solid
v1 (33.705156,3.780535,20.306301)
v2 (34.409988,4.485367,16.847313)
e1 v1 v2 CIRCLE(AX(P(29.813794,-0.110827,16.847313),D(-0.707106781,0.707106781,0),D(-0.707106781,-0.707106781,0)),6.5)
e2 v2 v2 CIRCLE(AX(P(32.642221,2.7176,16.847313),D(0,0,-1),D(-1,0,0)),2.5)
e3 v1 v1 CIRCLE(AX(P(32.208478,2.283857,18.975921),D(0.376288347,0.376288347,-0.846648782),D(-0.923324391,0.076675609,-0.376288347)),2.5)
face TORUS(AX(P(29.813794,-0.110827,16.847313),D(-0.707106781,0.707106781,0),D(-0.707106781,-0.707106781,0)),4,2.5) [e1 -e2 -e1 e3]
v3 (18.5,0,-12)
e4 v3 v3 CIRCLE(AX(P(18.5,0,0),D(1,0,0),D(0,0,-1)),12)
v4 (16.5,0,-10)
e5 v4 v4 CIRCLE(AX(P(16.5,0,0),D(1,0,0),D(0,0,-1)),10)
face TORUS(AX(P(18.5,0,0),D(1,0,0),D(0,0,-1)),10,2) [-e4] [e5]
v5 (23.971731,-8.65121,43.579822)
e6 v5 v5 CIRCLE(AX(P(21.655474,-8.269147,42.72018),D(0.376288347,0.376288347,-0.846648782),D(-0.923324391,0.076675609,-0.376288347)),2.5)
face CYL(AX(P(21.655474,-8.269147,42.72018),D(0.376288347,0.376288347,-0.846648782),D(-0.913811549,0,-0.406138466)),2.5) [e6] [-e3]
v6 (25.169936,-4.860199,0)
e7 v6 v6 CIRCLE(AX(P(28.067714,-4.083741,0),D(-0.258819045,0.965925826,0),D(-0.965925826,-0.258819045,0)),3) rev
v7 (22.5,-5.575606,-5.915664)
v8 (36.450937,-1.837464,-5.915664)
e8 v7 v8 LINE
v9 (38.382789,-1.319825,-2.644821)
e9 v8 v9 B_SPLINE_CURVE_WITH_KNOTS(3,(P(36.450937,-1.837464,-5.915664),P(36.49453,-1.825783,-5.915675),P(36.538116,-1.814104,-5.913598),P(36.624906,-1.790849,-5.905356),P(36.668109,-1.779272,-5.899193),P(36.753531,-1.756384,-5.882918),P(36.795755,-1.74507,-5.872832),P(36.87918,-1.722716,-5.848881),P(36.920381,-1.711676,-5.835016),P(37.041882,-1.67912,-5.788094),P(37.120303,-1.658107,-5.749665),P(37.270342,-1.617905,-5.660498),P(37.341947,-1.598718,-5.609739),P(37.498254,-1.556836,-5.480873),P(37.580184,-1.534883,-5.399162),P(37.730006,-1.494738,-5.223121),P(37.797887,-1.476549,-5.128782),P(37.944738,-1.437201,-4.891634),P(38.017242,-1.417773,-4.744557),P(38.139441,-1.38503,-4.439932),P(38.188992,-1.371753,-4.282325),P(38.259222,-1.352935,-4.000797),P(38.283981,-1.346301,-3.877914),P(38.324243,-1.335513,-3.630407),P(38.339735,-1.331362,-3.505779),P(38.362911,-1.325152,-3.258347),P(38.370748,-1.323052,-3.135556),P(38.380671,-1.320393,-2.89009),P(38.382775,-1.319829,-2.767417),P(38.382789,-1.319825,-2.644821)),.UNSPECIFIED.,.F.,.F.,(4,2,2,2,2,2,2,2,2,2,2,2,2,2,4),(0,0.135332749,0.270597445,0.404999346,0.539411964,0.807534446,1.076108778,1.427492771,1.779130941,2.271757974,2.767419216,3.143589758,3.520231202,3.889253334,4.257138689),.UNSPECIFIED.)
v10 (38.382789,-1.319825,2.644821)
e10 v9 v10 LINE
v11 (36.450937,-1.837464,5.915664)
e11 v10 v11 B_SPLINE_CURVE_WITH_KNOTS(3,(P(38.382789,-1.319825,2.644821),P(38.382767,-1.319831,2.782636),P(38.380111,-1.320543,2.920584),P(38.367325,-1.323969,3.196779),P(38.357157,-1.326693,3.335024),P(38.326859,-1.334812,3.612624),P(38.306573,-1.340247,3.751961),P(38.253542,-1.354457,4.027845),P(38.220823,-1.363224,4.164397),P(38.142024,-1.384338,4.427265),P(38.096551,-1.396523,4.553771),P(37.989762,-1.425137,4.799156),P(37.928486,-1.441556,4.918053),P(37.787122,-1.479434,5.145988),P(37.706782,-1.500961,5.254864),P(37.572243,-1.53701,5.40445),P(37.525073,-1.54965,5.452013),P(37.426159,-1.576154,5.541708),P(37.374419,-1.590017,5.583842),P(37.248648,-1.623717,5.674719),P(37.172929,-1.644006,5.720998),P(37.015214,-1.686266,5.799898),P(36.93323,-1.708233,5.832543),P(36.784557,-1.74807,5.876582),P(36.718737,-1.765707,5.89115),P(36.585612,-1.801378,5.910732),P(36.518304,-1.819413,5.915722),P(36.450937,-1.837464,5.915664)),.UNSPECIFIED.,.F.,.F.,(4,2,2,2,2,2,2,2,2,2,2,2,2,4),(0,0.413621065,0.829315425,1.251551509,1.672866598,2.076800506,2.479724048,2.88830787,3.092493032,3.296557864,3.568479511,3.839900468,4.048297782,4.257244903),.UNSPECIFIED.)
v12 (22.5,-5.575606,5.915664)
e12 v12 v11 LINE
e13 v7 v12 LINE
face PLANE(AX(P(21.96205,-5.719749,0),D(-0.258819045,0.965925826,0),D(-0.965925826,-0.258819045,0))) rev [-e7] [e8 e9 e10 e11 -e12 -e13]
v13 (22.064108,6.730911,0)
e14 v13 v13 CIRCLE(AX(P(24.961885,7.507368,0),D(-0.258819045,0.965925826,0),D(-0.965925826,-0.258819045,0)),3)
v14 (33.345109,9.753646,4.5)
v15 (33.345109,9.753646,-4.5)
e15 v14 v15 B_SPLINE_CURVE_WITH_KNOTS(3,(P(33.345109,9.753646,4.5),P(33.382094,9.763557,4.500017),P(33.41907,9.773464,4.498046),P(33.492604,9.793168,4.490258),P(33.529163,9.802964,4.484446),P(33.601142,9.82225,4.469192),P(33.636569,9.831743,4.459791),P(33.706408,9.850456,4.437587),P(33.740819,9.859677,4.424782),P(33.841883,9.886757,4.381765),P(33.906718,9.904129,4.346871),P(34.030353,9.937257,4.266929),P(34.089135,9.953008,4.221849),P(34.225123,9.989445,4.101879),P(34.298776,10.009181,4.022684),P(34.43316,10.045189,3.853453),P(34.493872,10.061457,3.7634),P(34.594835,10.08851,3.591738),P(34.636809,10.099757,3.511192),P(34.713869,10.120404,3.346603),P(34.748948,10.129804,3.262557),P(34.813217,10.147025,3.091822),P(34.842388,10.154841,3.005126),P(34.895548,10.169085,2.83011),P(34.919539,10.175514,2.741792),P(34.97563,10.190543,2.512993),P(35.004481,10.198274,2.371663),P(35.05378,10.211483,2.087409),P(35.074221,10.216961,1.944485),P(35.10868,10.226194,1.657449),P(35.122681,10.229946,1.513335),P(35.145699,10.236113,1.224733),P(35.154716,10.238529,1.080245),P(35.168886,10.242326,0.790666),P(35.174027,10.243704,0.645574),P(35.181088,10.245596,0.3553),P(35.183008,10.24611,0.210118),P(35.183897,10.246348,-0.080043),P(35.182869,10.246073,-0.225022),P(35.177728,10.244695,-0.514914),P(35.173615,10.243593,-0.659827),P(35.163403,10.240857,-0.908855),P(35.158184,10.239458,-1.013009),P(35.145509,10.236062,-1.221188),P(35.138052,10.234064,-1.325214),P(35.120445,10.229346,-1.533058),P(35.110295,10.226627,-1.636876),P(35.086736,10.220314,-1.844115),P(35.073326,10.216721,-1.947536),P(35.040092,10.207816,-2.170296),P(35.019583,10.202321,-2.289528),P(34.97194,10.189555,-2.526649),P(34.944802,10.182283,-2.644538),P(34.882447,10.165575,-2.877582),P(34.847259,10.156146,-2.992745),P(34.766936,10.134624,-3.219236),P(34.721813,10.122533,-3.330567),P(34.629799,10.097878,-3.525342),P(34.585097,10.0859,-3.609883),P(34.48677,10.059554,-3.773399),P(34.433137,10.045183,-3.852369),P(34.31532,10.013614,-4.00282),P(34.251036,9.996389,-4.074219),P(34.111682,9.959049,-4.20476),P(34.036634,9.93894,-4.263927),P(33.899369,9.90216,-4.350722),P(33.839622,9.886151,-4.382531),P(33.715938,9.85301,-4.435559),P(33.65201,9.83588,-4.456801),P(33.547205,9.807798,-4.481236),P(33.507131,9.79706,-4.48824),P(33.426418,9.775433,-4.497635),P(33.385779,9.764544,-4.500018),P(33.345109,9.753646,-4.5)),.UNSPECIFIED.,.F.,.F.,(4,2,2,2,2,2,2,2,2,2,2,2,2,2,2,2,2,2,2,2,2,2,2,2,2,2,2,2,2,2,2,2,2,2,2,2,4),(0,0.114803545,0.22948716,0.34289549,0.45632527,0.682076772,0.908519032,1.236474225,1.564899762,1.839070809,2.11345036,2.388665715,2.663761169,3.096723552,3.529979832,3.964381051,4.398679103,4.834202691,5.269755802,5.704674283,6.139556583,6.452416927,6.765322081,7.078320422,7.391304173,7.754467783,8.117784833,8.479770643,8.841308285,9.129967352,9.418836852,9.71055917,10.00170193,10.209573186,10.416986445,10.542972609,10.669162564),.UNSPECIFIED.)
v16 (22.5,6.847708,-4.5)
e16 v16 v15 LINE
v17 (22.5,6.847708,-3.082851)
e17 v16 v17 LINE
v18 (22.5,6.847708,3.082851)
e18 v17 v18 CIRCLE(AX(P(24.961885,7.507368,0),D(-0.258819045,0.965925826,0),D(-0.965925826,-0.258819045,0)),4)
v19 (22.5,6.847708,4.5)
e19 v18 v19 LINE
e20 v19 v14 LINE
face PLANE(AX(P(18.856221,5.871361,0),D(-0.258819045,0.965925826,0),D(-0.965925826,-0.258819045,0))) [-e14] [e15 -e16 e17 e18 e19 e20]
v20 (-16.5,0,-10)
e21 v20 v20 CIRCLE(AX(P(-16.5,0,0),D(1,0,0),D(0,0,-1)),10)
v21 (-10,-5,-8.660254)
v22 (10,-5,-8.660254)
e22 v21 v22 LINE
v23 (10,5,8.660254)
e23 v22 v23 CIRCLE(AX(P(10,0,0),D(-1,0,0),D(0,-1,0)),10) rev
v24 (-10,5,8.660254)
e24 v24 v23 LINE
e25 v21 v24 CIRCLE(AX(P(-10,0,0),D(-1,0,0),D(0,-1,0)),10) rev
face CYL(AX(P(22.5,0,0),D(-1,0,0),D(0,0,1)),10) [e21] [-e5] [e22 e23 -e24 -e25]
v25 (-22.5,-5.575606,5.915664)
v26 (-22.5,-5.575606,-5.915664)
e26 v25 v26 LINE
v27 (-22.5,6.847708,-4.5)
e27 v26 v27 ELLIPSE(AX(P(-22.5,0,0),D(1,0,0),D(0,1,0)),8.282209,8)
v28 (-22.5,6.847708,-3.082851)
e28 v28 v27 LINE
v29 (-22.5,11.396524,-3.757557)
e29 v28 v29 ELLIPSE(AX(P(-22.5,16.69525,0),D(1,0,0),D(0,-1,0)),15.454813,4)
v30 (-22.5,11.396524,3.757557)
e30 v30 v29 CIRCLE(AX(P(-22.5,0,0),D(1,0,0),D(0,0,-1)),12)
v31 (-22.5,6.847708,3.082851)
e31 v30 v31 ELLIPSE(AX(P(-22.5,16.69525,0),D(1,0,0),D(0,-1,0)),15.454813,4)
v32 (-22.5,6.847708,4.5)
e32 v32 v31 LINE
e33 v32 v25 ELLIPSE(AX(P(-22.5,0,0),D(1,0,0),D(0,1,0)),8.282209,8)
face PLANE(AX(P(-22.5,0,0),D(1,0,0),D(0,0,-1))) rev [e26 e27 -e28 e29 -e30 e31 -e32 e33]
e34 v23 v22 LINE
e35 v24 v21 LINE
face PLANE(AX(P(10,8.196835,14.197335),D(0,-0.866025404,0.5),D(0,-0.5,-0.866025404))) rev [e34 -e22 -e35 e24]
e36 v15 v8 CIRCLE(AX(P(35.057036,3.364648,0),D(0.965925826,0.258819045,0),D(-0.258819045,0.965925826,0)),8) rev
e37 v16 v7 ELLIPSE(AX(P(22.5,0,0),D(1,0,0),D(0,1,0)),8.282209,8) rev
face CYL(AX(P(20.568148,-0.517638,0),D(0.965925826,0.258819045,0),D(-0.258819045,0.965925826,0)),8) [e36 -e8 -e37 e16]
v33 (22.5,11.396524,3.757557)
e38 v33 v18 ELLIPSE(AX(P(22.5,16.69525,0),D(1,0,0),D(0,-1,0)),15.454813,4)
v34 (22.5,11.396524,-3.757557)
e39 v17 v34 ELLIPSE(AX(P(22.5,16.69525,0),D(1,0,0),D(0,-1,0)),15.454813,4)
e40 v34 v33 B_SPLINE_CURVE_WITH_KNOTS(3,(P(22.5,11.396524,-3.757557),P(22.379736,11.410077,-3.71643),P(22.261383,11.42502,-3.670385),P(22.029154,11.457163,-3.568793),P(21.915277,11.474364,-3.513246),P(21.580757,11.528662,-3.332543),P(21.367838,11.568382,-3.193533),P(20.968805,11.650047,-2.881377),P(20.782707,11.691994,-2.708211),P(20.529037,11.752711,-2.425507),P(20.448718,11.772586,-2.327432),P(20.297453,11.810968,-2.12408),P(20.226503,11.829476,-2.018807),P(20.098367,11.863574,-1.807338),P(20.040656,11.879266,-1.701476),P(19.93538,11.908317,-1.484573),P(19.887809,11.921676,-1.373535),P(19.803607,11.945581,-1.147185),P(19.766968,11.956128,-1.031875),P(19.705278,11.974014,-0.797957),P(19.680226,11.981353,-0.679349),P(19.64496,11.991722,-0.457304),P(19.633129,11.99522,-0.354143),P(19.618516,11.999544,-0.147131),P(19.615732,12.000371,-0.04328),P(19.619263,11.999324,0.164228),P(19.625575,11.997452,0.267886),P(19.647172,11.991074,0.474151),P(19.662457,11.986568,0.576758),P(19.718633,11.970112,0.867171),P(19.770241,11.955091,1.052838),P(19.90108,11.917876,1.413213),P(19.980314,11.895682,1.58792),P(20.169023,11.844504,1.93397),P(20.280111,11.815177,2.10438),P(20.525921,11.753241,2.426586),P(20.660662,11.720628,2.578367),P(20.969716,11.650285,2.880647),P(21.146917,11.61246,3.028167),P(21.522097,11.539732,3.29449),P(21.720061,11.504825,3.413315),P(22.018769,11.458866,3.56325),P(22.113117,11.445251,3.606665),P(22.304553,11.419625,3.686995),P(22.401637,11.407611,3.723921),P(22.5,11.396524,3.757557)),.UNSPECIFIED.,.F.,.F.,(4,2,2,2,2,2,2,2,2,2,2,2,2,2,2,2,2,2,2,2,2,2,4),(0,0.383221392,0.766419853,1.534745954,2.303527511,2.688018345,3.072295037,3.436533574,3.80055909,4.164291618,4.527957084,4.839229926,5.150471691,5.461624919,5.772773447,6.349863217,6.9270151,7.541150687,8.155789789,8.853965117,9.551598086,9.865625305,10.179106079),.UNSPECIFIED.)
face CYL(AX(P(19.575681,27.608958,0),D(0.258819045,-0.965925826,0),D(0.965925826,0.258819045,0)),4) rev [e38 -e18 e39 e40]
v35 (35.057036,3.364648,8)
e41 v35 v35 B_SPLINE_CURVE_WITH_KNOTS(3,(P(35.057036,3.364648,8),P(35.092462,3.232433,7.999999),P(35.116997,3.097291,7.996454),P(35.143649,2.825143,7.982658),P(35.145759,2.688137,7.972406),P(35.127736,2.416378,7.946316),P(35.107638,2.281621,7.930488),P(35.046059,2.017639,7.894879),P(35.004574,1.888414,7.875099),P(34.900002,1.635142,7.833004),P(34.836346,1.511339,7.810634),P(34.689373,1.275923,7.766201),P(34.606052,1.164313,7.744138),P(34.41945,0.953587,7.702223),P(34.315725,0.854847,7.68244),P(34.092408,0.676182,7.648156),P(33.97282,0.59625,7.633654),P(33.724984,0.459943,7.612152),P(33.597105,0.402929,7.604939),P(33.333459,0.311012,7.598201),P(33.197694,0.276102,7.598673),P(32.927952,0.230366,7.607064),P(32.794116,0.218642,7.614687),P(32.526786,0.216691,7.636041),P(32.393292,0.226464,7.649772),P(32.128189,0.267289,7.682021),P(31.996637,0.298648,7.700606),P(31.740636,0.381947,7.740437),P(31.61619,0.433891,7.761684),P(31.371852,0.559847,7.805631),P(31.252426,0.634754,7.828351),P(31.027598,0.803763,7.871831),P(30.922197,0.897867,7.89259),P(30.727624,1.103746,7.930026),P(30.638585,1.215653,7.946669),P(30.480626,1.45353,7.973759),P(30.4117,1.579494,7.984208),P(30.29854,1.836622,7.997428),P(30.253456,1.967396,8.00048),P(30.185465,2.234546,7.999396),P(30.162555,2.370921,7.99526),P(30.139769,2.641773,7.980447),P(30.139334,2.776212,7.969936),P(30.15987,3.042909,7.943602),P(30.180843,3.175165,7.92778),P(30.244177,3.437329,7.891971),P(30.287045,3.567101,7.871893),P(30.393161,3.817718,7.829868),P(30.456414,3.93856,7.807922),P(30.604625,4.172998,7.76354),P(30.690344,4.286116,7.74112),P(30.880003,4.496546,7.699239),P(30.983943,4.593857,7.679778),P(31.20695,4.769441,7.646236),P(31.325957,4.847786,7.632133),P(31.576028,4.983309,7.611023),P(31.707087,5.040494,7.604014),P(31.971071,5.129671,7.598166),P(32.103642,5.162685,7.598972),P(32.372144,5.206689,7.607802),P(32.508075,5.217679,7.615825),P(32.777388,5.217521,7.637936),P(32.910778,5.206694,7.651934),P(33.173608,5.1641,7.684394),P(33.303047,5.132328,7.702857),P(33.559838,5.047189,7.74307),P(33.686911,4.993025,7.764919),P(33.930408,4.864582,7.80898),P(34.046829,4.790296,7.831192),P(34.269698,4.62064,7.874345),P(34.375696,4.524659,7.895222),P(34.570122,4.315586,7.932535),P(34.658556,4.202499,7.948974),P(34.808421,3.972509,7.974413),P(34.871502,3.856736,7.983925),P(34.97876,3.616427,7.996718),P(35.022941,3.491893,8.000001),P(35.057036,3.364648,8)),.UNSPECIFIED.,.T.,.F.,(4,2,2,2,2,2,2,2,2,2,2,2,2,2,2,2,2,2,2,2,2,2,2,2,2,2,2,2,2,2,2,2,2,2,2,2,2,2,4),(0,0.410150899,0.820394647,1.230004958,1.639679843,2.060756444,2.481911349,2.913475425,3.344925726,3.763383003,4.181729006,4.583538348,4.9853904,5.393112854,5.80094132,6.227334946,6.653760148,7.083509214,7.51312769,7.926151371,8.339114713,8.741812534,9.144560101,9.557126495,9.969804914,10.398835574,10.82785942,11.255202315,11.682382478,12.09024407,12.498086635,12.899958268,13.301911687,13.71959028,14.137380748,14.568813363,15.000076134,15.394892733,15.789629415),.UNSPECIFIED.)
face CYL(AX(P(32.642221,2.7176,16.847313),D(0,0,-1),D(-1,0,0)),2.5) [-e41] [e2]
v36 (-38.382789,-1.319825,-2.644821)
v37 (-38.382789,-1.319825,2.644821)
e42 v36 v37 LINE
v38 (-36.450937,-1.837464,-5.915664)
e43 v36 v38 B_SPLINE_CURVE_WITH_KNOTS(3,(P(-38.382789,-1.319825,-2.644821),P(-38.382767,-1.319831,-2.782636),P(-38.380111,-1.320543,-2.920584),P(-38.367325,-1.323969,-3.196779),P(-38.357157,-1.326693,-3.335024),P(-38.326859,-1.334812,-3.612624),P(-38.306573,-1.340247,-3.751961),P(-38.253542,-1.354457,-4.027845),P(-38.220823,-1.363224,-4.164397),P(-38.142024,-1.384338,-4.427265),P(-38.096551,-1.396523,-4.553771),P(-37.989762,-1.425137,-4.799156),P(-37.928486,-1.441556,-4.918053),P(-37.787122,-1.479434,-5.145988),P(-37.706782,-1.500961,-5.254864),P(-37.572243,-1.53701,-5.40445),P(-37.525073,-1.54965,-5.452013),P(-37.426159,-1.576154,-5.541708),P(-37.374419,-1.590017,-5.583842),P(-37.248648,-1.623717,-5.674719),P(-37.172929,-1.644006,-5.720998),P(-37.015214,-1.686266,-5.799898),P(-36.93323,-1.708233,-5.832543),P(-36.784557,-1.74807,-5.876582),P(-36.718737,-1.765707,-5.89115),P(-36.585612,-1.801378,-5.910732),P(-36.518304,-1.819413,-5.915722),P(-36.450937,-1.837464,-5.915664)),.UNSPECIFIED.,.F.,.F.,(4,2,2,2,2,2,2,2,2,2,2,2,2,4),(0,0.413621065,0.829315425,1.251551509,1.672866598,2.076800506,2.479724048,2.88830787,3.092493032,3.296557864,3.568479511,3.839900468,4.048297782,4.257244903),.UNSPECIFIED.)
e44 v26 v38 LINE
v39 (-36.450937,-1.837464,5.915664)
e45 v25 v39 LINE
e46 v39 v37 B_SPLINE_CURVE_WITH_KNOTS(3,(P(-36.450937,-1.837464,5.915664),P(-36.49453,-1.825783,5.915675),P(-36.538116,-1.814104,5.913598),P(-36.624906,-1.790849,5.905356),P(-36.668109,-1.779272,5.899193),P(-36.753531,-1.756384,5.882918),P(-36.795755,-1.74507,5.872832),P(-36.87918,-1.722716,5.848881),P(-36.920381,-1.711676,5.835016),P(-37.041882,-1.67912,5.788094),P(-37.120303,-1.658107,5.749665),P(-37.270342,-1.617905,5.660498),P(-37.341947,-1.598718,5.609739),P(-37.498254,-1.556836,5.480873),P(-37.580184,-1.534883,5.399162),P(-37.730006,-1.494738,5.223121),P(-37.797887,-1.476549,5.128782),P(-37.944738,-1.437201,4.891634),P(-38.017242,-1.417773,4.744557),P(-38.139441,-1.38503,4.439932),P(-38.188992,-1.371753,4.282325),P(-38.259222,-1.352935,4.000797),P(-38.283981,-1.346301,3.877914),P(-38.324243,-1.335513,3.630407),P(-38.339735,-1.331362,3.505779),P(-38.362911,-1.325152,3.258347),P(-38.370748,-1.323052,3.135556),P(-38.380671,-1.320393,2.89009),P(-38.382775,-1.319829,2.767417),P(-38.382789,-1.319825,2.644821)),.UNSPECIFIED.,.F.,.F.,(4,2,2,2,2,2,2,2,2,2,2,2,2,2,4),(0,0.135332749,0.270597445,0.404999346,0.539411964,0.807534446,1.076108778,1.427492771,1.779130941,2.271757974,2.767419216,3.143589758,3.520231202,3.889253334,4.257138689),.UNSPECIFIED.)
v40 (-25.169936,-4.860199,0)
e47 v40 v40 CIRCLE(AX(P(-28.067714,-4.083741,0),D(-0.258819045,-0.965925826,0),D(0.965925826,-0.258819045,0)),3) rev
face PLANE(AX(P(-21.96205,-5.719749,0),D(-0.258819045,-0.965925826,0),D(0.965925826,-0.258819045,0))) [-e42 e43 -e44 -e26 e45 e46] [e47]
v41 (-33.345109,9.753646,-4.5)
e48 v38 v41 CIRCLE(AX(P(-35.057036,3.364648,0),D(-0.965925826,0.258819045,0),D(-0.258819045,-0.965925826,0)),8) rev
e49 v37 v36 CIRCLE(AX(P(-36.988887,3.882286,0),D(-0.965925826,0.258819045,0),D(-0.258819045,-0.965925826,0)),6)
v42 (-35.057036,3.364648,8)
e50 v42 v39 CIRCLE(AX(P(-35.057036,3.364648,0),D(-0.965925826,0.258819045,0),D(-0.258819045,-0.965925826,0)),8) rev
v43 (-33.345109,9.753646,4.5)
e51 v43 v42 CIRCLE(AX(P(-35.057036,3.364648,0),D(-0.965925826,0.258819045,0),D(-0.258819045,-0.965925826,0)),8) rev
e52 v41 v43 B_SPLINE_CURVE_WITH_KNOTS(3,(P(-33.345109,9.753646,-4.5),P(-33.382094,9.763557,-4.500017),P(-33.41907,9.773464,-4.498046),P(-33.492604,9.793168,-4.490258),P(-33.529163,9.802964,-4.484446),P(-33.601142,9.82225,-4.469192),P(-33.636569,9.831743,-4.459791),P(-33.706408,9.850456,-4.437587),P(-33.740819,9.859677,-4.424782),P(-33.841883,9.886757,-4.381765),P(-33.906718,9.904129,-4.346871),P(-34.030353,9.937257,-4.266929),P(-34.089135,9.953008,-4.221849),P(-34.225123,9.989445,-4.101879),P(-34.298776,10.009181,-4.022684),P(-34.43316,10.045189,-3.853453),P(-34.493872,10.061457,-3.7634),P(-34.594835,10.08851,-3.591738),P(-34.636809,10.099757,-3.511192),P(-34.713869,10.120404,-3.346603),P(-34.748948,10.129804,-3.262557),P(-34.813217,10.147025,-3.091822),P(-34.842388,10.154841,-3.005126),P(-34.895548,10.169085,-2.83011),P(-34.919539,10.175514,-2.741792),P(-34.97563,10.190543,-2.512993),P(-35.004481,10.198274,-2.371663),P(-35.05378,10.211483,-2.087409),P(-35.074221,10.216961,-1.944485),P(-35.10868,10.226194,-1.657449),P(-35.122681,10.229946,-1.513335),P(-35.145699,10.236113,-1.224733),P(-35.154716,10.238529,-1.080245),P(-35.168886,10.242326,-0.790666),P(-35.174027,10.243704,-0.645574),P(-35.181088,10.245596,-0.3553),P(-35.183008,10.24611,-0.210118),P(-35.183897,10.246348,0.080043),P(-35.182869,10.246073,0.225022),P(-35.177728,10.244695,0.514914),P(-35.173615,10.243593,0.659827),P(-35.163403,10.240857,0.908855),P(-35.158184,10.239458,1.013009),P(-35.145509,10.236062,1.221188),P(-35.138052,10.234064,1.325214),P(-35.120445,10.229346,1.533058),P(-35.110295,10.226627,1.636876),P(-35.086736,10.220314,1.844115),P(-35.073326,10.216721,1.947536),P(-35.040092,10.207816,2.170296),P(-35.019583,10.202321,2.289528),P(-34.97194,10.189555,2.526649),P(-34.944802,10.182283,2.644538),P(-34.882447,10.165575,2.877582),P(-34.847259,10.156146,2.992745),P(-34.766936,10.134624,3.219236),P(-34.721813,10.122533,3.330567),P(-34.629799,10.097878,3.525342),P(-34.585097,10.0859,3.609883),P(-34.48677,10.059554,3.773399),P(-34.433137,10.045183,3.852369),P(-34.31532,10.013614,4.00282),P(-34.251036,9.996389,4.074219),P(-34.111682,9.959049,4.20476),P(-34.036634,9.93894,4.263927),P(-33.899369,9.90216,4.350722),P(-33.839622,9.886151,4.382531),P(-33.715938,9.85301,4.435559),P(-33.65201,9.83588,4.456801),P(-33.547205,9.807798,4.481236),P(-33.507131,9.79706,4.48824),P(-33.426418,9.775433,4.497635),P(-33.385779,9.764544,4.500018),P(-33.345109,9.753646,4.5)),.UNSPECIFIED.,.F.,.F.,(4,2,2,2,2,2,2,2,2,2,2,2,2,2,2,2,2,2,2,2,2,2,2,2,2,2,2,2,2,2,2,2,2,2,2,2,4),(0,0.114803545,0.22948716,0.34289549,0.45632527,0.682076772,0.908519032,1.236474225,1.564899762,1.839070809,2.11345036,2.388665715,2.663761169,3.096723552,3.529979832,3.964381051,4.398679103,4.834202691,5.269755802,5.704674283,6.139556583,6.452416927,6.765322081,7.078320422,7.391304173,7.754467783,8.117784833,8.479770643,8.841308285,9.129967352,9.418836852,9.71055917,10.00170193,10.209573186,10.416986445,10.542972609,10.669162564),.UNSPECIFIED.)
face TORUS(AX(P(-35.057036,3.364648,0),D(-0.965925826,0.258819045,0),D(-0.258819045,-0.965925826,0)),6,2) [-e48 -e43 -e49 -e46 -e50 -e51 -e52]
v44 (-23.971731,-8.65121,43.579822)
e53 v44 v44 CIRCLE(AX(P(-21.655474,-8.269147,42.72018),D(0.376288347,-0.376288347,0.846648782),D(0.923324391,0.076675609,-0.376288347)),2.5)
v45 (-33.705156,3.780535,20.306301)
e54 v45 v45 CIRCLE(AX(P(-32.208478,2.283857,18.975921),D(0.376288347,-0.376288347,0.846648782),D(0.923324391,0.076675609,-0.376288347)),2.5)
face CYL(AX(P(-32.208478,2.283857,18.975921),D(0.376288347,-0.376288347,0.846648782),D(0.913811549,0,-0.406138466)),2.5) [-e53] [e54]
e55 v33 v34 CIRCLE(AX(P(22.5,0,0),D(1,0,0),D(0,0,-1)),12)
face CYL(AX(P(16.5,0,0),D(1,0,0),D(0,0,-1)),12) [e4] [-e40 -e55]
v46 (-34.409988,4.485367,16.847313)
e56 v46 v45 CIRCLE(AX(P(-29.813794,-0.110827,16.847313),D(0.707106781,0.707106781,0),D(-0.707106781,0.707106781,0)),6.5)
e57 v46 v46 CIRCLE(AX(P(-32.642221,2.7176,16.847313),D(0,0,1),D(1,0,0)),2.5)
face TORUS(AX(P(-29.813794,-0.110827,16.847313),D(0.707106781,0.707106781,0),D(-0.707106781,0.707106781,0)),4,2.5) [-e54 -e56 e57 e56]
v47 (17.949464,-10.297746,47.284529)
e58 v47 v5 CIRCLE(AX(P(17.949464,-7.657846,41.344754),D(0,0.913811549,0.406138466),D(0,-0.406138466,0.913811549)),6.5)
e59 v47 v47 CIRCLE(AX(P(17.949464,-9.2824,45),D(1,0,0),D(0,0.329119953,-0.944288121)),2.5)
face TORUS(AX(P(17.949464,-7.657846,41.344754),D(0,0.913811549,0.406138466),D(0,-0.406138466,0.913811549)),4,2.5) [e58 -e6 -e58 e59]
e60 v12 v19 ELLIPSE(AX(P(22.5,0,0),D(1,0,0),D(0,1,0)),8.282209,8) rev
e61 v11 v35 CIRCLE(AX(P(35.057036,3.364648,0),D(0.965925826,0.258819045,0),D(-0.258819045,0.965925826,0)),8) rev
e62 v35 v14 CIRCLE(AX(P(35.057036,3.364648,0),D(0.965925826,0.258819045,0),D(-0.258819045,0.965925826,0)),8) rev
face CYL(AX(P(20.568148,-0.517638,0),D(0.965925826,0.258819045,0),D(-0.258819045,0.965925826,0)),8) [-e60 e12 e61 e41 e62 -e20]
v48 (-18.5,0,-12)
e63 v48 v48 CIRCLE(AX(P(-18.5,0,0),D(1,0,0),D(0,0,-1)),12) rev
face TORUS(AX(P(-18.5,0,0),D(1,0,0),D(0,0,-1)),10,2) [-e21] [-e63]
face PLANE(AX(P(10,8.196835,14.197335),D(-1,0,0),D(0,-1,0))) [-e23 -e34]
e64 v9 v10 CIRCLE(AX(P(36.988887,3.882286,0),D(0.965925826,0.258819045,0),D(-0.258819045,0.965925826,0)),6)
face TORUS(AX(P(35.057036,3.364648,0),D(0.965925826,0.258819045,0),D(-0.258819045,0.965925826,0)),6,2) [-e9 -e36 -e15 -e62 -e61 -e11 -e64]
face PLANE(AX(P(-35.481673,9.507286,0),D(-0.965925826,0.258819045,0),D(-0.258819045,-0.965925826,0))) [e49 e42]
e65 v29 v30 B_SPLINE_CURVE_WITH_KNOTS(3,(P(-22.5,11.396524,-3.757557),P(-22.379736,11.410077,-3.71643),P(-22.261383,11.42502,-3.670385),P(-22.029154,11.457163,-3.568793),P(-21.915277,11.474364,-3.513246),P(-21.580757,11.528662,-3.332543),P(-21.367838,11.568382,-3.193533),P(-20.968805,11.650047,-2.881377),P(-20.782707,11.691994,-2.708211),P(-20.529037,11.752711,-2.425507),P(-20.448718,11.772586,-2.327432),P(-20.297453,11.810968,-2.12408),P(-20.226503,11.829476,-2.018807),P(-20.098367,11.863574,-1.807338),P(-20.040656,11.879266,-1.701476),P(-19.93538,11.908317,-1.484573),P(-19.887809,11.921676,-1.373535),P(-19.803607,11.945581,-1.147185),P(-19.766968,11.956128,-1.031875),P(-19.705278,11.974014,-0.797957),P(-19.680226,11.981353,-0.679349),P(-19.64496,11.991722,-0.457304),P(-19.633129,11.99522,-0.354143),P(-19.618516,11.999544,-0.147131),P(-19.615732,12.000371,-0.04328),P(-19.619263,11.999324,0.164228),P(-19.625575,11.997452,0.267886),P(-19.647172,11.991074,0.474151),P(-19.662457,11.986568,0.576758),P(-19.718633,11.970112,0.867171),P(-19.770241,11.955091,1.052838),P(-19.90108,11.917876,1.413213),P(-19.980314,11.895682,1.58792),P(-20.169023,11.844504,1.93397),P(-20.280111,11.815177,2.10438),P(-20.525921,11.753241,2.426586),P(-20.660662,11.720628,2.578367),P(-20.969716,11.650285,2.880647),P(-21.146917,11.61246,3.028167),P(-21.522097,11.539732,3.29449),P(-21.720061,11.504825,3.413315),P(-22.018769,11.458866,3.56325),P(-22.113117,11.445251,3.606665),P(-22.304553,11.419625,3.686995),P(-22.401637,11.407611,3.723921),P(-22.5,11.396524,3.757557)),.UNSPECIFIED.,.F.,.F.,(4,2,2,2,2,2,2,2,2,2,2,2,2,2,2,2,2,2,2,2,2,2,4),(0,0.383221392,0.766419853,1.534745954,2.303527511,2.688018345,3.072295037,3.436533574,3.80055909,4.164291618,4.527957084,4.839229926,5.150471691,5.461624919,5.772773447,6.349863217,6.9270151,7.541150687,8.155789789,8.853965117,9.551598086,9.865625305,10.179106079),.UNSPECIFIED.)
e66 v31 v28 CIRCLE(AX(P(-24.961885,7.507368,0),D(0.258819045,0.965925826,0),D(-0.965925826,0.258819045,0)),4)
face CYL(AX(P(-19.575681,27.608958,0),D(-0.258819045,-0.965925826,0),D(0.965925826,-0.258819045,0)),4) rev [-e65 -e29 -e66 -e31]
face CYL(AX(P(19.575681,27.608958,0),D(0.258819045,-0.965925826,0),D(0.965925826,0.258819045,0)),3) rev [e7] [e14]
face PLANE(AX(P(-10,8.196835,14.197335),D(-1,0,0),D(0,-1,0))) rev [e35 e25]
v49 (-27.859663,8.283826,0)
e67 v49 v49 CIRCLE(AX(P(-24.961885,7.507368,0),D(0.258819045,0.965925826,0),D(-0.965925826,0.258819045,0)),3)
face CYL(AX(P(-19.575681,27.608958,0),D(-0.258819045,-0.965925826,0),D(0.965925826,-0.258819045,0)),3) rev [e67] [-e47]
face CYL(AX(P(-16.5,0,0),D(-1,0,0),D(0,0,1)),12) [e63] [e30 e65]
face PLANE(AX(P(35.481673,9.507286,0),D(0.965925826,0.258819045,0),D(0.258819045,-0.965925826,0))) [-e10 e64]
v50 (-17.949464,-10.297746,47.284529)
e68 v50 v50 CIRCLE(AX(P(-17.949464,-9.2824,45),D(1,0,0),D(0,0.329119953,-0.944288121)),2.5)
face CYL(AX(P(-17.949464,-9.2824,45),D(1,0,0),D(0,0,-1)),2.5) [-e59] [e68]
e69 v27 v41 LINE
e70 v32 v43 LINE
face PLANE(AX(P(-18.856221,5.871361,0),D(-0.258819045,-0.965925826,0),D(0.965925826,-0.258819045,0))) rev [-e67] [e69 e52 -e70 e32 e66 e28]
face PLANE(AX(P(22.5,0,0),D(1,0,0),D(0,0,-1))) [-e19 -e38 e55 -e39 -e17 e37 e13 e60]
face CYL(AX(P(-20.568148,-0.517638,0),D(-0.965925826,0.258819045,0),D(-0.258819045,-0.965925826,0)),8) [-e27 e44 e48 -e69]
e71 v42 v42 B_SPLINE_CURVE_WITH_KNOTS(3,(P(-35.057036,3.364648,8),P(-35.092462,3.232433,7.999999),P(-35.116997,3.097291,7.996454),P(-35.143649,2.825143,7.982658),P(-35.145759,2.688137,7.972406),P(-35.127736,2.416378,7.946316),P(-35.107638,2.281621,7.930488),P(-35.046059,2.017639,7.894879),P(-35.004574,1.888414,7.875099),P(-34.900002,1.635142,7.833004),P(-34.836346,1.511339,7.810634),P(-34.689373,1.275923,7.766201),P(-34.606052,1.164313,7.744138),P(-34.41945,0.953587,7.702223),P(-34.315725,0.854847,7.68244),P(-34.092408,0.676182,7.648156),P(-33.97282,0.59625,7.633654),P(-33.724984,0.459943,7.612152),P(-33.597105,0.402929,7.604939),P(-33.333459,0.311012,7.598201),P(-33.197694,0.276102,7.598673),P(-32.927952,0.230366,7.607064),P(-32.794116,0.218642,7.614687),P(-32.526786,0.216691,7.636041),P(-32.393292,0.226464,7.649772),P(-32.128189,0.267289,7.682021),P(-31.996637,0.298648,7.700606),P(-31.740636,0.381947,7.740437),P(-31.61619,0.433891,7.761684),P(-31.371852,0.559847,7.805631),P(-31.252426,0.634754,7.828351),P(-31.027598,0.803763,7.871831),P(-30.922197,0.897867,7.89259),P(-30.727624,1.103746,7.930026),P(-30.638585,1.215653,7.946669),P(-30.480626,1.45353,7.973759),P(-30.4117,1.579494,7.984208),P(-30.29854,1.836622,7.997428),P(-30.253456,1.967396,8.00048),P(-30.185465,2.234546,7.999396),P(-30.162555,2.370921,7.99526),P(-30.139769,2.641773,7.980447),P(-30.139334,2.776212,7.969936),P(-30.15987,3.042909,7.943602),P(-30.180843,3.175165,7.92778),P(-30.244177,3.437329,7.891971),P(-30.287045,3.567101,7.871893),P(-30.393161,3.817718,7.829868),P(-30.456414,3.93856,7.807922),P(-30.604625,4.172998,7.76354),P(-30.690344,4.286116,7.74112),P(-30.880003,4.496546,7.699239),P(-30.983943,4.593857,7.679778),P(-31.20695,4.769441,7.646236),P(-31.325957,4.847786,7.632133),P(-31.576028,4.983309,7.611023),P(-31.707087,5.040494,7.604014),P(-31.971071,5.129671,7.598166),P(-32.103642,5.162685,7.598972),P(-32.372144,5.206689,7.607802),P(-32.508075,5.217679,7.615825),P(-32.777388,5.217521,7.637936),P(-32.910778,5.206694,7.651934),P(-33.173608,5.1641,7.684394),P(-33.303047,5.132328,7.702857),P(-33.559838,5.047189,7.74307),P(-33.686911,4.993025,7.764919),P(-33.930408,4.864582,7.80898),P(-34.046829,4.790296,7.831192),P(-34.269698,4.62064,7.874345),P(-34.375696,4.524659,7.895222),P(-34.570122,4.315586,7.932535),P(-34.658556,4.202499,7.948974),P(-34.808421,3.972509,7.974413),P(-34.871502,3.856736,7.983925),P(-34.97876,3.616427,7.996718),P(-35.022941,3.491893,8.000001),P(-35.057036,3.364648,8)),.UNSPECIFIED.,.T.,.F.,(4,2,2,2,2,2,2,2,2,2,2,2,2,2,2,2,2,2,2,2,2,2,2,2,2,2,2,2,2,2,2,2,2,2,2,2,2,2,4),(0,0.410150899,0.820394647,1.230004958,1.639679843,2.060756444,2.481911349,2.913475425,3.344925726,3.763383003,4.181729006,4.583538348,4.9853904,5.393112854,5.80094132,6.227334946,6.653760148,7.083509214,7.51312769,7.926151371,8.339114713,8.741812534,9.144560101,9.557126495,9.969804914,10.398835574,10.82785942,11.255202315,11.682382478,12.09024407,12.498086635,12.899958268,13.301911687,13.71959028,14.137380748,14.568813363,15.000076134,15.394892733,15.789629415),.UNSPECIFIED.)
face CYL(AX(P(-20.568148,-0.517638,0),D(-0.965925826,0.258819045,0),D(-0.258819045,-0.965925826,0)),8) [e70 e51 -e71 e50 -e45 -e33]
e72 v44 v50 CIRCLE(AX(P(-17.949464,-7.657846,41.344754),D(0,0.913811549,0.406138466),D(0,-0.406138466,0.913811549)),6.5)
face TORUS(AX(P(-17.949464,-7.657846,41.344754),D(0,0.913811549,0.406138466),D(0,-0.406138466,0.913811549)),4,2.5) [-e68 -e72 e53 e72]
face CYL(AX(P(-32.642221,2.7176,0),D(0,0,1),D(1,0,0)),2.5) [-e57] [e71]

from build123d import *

# Parameters (mm, degrees)
SKETCH3_R                           = 10
BOSS_EXTRUDE1_DEPTH                 = 22.5
BOSS_EXTRUDE2_START                 = -22.5
SKETCH5_R                           = 12
BOSS_EXTRUDE2_DEPTH                 = 6
BOSS_EXTRUDE3_START                 = 16.5
SKETCH5_2_R                         = 12
BOSS_EXTRUDE3_DEPTH                 = 6
FILLET1_R                           = 2
BOSS_EXTRUDE4_START                 = -2
BOSS_EXTRUDE4_DEPTH                 = 17
FILLET2_R                           = 2
FILLET2_OF_MIRROR1_R                = 2
CUT_EXTRUDE1_REACH                  = 43.967
CUT_EXTRUDE1_END_RADIUS             = 10
CUT_EXTRUDE1_DIRECTION_2_REACH      = 43.967
CUT_EXTRUDE1_DIRECTION_2_END_RADIUS = 10
SKETCH8_R                           = 2.500000000000002
CUT_EXTRUDE2_REACH                  = 64.515
SKETCH9_R                           = 3.000000000000001
CUT_EXTRUDE2_DIRECTION_2_REACH      = 64.515
CUT_EXTRUDE3_REACH                  = 64.515
SKETCH10_R                          = 3.000000000000001
CUT_EXTRUDE3_DIRECTION_2_REACH      = 64.515
CUT_EXTRUDE4_REACH                  = 64.515
CUT_EXTRUDE4_END_RADIUS             = 12.000000000000002
SKETCH9_3_R                         = 3.999999999999999
SKETCH9_3_R_2                       = 3.000000000000001
CUT_EXTRUDE5_REACH                  = 64.515
CUT_EXTRUDE5_END_RADIUS             = 12.000000000000002
SKETCH10_3_R                        = 3.999999999999999
SKETCH10_3_R_2                      = 3.000000000000001


# Some blends are built 0.0001 mm under size
with BuildPart() as part:
    # Sketch3 → Boss-Extrude1 (new, symmetric)
    with BuildSketch(Plane(origin=(0, 0, 0), x_dir=(0, 0, -1), z_dir=(1, 0, 0))):
        with Locations(Location((0, 0, 0), (0, 0, 180))):
            Circle(SKETCH3_R)
    extrude(amount=BOSS_EXTRUDE1_DEPTH, both=True)

    # Sketch5 → Boss-Extrude2 (add)
    with BuildSketch(Plane(origin=(0, 0, 0), x_dir=(0, 0, -1), z_dir=(1, 0, 0)).offset(BOSS_EXTRUDE2_START)):
        Circle(SKETCH5_R)
    extrude(amount=BOSS_EXTRUDE2_DEPTH)

    # Sketch5<2> → Boss-Extrude3 (add)
    with BuildSketch(Plane(origin=(0, 0, 0), x_dir=(0, 0, -1), z_dir=(1, 0, 0)).offset(BOSS_EXTRUDE3_START)):
        Circle(SKETCH5_2_R)
    extrude(amount=BOSS_EXTRUDE3_DEPTH)

    # Fillet1
    fillet1_edges = [part.edges().sort_by_distance(p)[0] for p in [
        (16.5, 1.47e-15, 12),
        (-16.5, 1.47e-15, 12),
    ]]
    fillet(fillet1_edges, radius=FILLET1_R - 0.0001)  # a hair under: the kernel refuses the full size

    # Sketch6 → Boss-Extrude4 (add)
    with BuildSketch(Plane(origin=(-20.992785792574967, 5.624999999999944, 0), x_dir=(0, 0, 1), z_dir=(-0.9659258262890691, 0.25881904510251796, 0)).offset(BOSS_EXTRUDE4_START)):
        with BuildLine():
            ThreePointArc((-4.499999999999999, 0.7909497628548223), (-7.944904864452854, -4.886152304293779), (-5.915663839661229, -11.209050237145178))
            Line((-5.915663839661229, -11.209050237145178), (5.915663839661229, -11.209050237145178))
            ThreePointArc((5.915663839661229, -11.209050237145178), (7.460740938984873, -8.710874556095584), (8, -5.823428514806657))
            ThreePointArc((8, -5.823428514806655), (7.0710678118654755, -2.081771128032713), (4.5, 0.7909497628548214))
            Line((4.5, 0.7909497628548219), (-4.5, 0.7909497628548219))
        make_face()
    boss_extrude4 = extrude(amount=BOSS_EXTRUDE4_DEPTH)

    # Fillet2
    # the kernel refuses this fillet: 2 mm, written as the material it takes off along each edge
    with BuildSketch(Plane(origin=(-36.98888739433603, 3.882285676537771, 7.99e-15), x_dir=(0.2587183771189647, 0.9655501282597527, -0.027888190305296125), z_dir=(-0.007217994784454129, -0.026937923264349944, -0.9996110487792219))) as fillet2_piece_1:
        with BuildLine():
            CenterArc((8.000000000000012 - FILLET2_R, 1.00283e-12 + FILLET2_R), FILLET2_R, 270.00000000000006, 89.99999999999989)
            Line((8.000000000000012 - FILLET2_R, 9.9767e-13), (8.000000000000012, 1.00283e-12))
            Line((8.000000000000012, 1.00283e-12), (8.00000000000001, 1.00283e-12 + FILLET2_R))
        make_face()
    revolve(axis=Axis((-36.98888739433603, 3.882285676537771, 7.99e-15), (0.9659258262890692, -0.25881904510251774, 0)), revolution_arc=169.73976769975488, mode=Mode.SUBTRACT)
    with BuildSketch(Plane(origin=(-36.98888739433603, 3.8822856765377667, 4e-15), x_dir=(0.25871837711896445, 0.9655501282597528, 0.02788819030529415), z_dir=(-0.007217994784453544, -0.026937923264348056, 0.9996110487792219))) as fillet2_piece_2:
        with BuildLine():
            CenterArc((8.000000000000002 - FILLET2_R, -FILLET2_R), FILLET2_R, 6.361e-14, 89.99999999999994)
            Line((8.000000000000002 - FILLET2_R, -8.9174e-13), (8.000000000000002, -8.9041e-13))
            Line((8.000000000000002, -8.9041e-13), (8.000000000000004, -FILLET2_R))
        make_face()
    revolve(axis=Axis((-36.98888739433603, 3.8822856765377667, 4e-15), (-0.9659258262890691, 0.25881904510251796, 0)), revolution_arc=169.73976769975465, mode=Mode.SUBTRACT)

    # Mirror1: Boss-Extrude4 across plane
    add(boss_extrude4.mirror(Plane(origin=(0, 0, 0), x_dir=(0, 0, 1), z_dir=(1, 0, 0))))

    # Fillet2 of Mirror1
    # the kernel refuses this fillet: 2 mm, written as the material it takes off along each edge
    with BuildSketch(Plane(origin=(36.98888739433603, 3.882285676537771, 7.99e-15), x_dir=(-0.2587183771189647, 0.9655501282597527, -0.027888190305296125), z_dir=(0.007217994784454129, -0.026937923264349944, -0.9996110487792219))) as fillet2_of_mirror1_piece_1:
        with BuildLine():
            CenterArc((8.000000000000014 - FILLET2_OF_MIRROR1_R, -FILLET2_OF_MIRROR1_R), FILLET2_OF_MIRROR1_R, 5.725e-14, 89.99999999999989)
            Line((8.000000000000014 - FILLET2_OF_MIRROR1_R, 7.8276e-13), (8.000000000000014, 7.776e-13))
            Line((8.000000000000014, 7.776e-13), (8.000000000000012, -FILLET2_OF_MIRROR1_R))
        make_face()
    revolve(axis=Axis((36.98888739433603, 3.882285676537771, 7.99e-15), (0.9659258262890692, 0.25881904510251774, 0)), revolution_arc=169.73976769975488, mode=Mode.SUBTRACT)
    with BuildSketch(Plane(origin=(36.98888739433604, 3.882285676537766, 4e-15), x_dir=(-0.2587183771189636, 0.965550128259753, 0.027888190305294047), z_dir=(0.0072179947844535726, -0.026937923264347942, 0.9996110487792218))) as fillet2_of_mirror1_piece_2:
        with BuildLine():
            CenterArc((8.000000000000004 - FILLET2_OF_MIRROR1_R, 1.02836e-12 + FILLET2_OF_MIRROR1_R), FILLET2_OF_MIRROR1_R, 270.00000000000006, 89.99999999999994)
            Line((8.000000000000004 - FILLET2_OF_MIRROR1_R, 1.02808e-12), (8.000000000000004, 1.02836e-12))
            Line((8.000000000000004, 1.02836e-12), (8.000000000000004, 1.02836e-12 + FILLET2_OF_MIRROR1_R))
        make_face()
    revolve(axis=Axis((36.98888739433604, 3.882285676537766, 4e-15), (-0.9659258262890691, -0.258819045102518, 0)), revolution_arc=169.73976769975462, mode=Mode.SUBTRACT)

    # Cut-Extrude1: up to this cylinder (the profile starts inside it)
    cut_extrude1_end = Plane(origin=(0, 0, 0), z_dir=(-1, 0, 0)) * Cylinder(CUT_EXTRUDE1_END_RADIUS, 108.934, mode=Mode.PRIVATE)
    # Sketch7 → Cut-Extrude1 (cut, up to the surface)
    with BuildSketch(Plane(origin=(0, 0, 0), x_dir=(1, 0, 0), z_dir=(0, 0.500000000000001, 0.866025403784438)), mode=Mode.PRIVATE) as cut_extrude1_sk1:
        Polygon((10, -1.22e-15), (-10, -1.22e-15), (-10.000000000000002, 10.000000000000002), (10.000000000000002, 10.000000000000002), align=None)
    cut_extrude1_tool1 = extrude(cut_extrude1_sk1.sketch, amount=-CUT_EXTRUDE1_REACH, mode=Mode.PRIVATE) & cut_extrude1_end
    add(cut_extrude1_tool1.solids().sort_by_distance((0, 4.330127, -2.5))[0], mode=Mode.SUBTRACT)

    # Cut-Extrude1 direction 2: up to this cylinder (the profile starts inside it)
    cut_extrude1_direction_2_end = Plane(origin=(0, 0, 0), z_dir=(-1, 0, 0)) * Cylinder(CUT_EXTRUDE1_DIRECTION_2_END_RADIUS, 108.934, mode=Mode.PRIVATE)
    # Sketch7 → Cut-Extrude1 direction 2 (cut, up to the surface)
    with BuildSketch(Plane(origin=(0, 0, 0), x_dir=(1, 0, 0), z_dir=(0, 0.500000000000001, 0.866025403784438)), mode=Mode.PRIVATE) as cut_extrude1_direction_2_sk1:
        Polygon((10, -1.22e-15), (-10, -1.22e-15), (-10.000000000000002, 10.000000000000002), (10.000000000000002, 10.000000000000002), align=None)
    cut_extrude1_direction_2_tool1 = extrude(cut_extrude1_direction_2_sk1.sketch, amount=CUT_EXTRUDE1_DIRECTION_2_REACH, mode=Mode.PRIVATE) & cut_extrude1_direction_2_end
    add(cut_extrude1_direction_2_tool1.solids().sort_by_distance((0, 4.330127, -2.5))[0], mode=Mode.SUBTRACT)

    # Sweep1: sweep along a curve in space
    with BuildLine() as sweep1_path:
        Line((-32.642221176035235, 2.717599973576442, 0), (-32.642221176035235, 2.717599973576442, 16.84731284149247))
        ThreePointArc((-32.642221176035235, 2.717599973576442, 16.84731284149247), (-32.531623171410644, 2.607001968951851, 17.9549272814661), (-32.20847843014491, 2.283857227686111, 18.975921178253238))
        Line((-32.20847843014491, 2.283857227686111, 18.975921178253238), (-21.655474351497375, -8.26914685096142, 42.72018035521019))
        ThreePointArc((-21.655474351497375, -8.26914685096142, 42.72018035521019), (-20.18322604872181, -9.005485979416132, 44.376943394233294), (-17.949463925940496, -9.282400026423558, 45))
        Line((-17.949463925940496, -9.282400026423558, 45), (17.9494639259405, -9.282400026423558, 45))
        ThreePointArc((21.655474351497375, -8.26914685096142, 42.72018035521019), (20.183226048721814, -9.00548597941613, 44.376943394233294), (17.9494639259405, -9.282400026423558, 45))
        Line((32.20847843014491, 2.283857227686111, 18.975921178253238), (21.655474351497375, -8.26914685096142, 42.72018035521019))
        ThreePointArc((32.642221176035235, 2.717599973576442, 16.84731284149247), (32.531623171410644, 2.607001968951851, 17.9549272814661), (32.20847843014491, 2.283857227686111, 18.975921178253238))
        Line((32.642221176035235, 2.717599973576442, 0), (32.642221176035235, 2.717599973576442, 16.84731284149247))
    # Sketch8 → Sweep1 (sweep)
    with BuildSketch(Plane.XY):
        with Locations((-32.642221176035235, 2.717599973576442)):
            Circle(SKETCH8_R)
    sweep(path=sweep1_path.line)

    # Sketch9 → Cut-Extrude2 (cut, up to next)
    with BuildSketch(Plane(origin=(0.20471286234614847, 0.7639988032386886, 0), x_dir=(0.9659258262890691, -0.25881904510251796, 0), z_dir=(0.25881904510251796, 0.9659258262890691, 0)), mode=Mode.PRIVATE) as cut_extrude2_sk1:
        with Locations((-26.0543797164392, -2.125e-14)):
            Circle(SKETCH9_R)
    cut_extrude2_tool1 = extrude(cut_extrude2_sk1.sketch, amount=-CUT_EXTRUDE2_REACH, mode=Mode.PRIVATE) & part.part
    add(cut_extrude2_tool1.solids().sort_by_distance((-24.961885, 7.507368, 0))[0], mode=Mode.SUBTRACT)

    # Sketch9 → Cut-Extrude2 direction 2 (cut, up to next)
    with BuildSketch(Plane(origin=(0.20471286234614847, 0.7639988032386886, 0), x_dir=(0.9659258262890691, -0.25881904510251796, 0), z_dir=(0.25881904510251796, 0.9659258262890691, 0)), mode=Mode.PRIVATE) as cut_extrude2_direction_2_sk1:
        with Locations((-26.0543797164392, -2.125e-14)):
            Circle(SKETCH9_R)
    cut_extrude2_direction_2_tool1 = extrude(cut_extrude2_direction_2_sk1.sketch, amount=CUT_EXTRUDE2_DIRECTION_2_REACH, mode=Mode.PRIVATE) & part.part
    add(cut_extrude2_direction_2_tool1.solids().sort_by_distance((-24.961885, 7.507368, 0))[0], mode=Mode.SUBTRACT)

    # Sketch10 → Cut-Extrude3 (cut, up to next)
    with BuildSketch(Plane(origin=(-0.20471286234614847, 0.7639988032386886, 0), x_dir=(0.9659258262890691, 0.25881904510251796, 0), z_dir=(-0.25881904510251796, 0.9659258262890691, 0)), mode=Mode.PRIVATE) as cut_extrude3_sk1:
        with Locations(Location((26.05437971643834, -3.903e-14, 0), (0, 0, 244.422045679))):
            Circle(SKETCH10_R)
    cut_extrude3_tool1 = extrude(cut_extrude3_sk1.sketch, amount=-CUT_EXTRUDE3_REACH, mode=Mode.PRIVATE) & part.part
    add(cut_extrude3_tool1.solids().sort_by_distance((24.961885, 7.507368, 0))[0], mode=Mode.SUBTRACT)

    # Sketch10 → Cut-Extrude3 direction 2 (cut, up to next)
    with BuildSketch(Plane(origin=(-0.20471286234614847, 0.7639988032386886, 0), x_dir=(0.9659258262890691, 0.25881904510251796, 0), z_dir=(-0.25881904510251796, 0.9659258262890691, 0)), mode=Mode.PRIVATE) as cut_extrude3_direction_2_sk1:
        with Locations(Location((26.05437971643834, -3.903e-14, 0), (0, 0, 244.422045679))):
            Circle(SKETCH10_R)
    cut_extrude3_direction_2_tool1 = extrude(cut_extrude3_direction_2_sk1.sketch, amount=CUT_EXTRUDE3_DIRECTION_2_REACH, mode=Mode.PRIVATE) & part.part
    add(cut_extrude3_direction_2_tool1.solids().sort_by_distance((24.961885, 7.507368, 0))[0], mode=Mode.SUBTRACT)

    # Cut-Extrude4: up to this cylinder (the profile starts inside it)
    cut_extrude4_end = Plane(origin=(-28.716307, 0, 0), z_dir=(-1, 0, 0)) * Cylinder(CUT_EXTRUDE4_END_RADIUS, 154.03, mode=Mode.PRIVATE)
    # Sketch9<3> → Cut-Extrude4 (cut, up to the surface)
    with BuildSketch(Plane(origin=(0.20471286234614847, 0.7639988032386886, 0), x_dir=(0.9659258262890691, -0.25881904510251796, 0), z_dir=(0.25881904510251796, 0.9659258262890691, 0)), mode=Mode.PRIVATE) as cut_extrude4_sk1:
        with Locations((-26.0543797164392, -2.125e-14)):
            Circle(SKETCH9_3_R)
        with Locations((-26.0543797164392, -2.125e-14)):
            Circle(SKETCH9_3_R_2, mode=Mode.SUBTRACT)
    cut_extrude4_tool1 = extrude(cut_extrude4_sk1.sketch, amount=CUT_EXTRUDE4_REACH, mode=Mode.PRIVATE) & cut_extrude4_end
    add(cut_extrude4_tool1.solids().sort_by_distance((-28.716307, 8.513363, 0))[0], mode=Mode.SUBTRACT)

    # Cut-Extrude5: up to this cylinder (the profile starts inside it)
    cut_extrude5_end = Plane(origin=(21.20746399999997, 4.7714e-13, -5.8095e-13), z_dir=(1, -4.77e-15, -2.54e-15)) * Cylinder(CUT_EXTRUDE5_END_RADIUS, 154.03, mode=Mode.PRIVATE)
    # Sketch10<3> → Cut-Extrude5 (cut, up to the surface)
    with BuildSketch(Plane(origin=(-0.20471286234614847, 0.7639988032386886, 0), x_dir=(0.9659258262890691, 0.25881904510251796, 0), z_dir=(-0.25881904510251796, 0.9659258262890691, 0)), mode=Mode.PRIVATE) as cut_extrude5_sk1:
        with Locations((26.05437971643834, -3.903e-14)):
            Circle(SKETCH10_3_R)
        with Locations(Location((26.05437971643834, -3.903e-14, 0), (0, 0, 180))):
            Circle(SKETCH10_3_R_2, mode=Mode.SUBTRACT)
    cut_extrude5_tool1 = extrude(cut_extrude5_sk1.sketch, amount=CUT_EXTRUDE5_REACH, mode=Mode.PRIVATE) & cut_extrude5_end
    add(cut_extrude5_tool1.solids().sort_by_distance((21.207464, 6.501374, 0))[0], mode=Mode.SUBTRACT)


solid = part.part
